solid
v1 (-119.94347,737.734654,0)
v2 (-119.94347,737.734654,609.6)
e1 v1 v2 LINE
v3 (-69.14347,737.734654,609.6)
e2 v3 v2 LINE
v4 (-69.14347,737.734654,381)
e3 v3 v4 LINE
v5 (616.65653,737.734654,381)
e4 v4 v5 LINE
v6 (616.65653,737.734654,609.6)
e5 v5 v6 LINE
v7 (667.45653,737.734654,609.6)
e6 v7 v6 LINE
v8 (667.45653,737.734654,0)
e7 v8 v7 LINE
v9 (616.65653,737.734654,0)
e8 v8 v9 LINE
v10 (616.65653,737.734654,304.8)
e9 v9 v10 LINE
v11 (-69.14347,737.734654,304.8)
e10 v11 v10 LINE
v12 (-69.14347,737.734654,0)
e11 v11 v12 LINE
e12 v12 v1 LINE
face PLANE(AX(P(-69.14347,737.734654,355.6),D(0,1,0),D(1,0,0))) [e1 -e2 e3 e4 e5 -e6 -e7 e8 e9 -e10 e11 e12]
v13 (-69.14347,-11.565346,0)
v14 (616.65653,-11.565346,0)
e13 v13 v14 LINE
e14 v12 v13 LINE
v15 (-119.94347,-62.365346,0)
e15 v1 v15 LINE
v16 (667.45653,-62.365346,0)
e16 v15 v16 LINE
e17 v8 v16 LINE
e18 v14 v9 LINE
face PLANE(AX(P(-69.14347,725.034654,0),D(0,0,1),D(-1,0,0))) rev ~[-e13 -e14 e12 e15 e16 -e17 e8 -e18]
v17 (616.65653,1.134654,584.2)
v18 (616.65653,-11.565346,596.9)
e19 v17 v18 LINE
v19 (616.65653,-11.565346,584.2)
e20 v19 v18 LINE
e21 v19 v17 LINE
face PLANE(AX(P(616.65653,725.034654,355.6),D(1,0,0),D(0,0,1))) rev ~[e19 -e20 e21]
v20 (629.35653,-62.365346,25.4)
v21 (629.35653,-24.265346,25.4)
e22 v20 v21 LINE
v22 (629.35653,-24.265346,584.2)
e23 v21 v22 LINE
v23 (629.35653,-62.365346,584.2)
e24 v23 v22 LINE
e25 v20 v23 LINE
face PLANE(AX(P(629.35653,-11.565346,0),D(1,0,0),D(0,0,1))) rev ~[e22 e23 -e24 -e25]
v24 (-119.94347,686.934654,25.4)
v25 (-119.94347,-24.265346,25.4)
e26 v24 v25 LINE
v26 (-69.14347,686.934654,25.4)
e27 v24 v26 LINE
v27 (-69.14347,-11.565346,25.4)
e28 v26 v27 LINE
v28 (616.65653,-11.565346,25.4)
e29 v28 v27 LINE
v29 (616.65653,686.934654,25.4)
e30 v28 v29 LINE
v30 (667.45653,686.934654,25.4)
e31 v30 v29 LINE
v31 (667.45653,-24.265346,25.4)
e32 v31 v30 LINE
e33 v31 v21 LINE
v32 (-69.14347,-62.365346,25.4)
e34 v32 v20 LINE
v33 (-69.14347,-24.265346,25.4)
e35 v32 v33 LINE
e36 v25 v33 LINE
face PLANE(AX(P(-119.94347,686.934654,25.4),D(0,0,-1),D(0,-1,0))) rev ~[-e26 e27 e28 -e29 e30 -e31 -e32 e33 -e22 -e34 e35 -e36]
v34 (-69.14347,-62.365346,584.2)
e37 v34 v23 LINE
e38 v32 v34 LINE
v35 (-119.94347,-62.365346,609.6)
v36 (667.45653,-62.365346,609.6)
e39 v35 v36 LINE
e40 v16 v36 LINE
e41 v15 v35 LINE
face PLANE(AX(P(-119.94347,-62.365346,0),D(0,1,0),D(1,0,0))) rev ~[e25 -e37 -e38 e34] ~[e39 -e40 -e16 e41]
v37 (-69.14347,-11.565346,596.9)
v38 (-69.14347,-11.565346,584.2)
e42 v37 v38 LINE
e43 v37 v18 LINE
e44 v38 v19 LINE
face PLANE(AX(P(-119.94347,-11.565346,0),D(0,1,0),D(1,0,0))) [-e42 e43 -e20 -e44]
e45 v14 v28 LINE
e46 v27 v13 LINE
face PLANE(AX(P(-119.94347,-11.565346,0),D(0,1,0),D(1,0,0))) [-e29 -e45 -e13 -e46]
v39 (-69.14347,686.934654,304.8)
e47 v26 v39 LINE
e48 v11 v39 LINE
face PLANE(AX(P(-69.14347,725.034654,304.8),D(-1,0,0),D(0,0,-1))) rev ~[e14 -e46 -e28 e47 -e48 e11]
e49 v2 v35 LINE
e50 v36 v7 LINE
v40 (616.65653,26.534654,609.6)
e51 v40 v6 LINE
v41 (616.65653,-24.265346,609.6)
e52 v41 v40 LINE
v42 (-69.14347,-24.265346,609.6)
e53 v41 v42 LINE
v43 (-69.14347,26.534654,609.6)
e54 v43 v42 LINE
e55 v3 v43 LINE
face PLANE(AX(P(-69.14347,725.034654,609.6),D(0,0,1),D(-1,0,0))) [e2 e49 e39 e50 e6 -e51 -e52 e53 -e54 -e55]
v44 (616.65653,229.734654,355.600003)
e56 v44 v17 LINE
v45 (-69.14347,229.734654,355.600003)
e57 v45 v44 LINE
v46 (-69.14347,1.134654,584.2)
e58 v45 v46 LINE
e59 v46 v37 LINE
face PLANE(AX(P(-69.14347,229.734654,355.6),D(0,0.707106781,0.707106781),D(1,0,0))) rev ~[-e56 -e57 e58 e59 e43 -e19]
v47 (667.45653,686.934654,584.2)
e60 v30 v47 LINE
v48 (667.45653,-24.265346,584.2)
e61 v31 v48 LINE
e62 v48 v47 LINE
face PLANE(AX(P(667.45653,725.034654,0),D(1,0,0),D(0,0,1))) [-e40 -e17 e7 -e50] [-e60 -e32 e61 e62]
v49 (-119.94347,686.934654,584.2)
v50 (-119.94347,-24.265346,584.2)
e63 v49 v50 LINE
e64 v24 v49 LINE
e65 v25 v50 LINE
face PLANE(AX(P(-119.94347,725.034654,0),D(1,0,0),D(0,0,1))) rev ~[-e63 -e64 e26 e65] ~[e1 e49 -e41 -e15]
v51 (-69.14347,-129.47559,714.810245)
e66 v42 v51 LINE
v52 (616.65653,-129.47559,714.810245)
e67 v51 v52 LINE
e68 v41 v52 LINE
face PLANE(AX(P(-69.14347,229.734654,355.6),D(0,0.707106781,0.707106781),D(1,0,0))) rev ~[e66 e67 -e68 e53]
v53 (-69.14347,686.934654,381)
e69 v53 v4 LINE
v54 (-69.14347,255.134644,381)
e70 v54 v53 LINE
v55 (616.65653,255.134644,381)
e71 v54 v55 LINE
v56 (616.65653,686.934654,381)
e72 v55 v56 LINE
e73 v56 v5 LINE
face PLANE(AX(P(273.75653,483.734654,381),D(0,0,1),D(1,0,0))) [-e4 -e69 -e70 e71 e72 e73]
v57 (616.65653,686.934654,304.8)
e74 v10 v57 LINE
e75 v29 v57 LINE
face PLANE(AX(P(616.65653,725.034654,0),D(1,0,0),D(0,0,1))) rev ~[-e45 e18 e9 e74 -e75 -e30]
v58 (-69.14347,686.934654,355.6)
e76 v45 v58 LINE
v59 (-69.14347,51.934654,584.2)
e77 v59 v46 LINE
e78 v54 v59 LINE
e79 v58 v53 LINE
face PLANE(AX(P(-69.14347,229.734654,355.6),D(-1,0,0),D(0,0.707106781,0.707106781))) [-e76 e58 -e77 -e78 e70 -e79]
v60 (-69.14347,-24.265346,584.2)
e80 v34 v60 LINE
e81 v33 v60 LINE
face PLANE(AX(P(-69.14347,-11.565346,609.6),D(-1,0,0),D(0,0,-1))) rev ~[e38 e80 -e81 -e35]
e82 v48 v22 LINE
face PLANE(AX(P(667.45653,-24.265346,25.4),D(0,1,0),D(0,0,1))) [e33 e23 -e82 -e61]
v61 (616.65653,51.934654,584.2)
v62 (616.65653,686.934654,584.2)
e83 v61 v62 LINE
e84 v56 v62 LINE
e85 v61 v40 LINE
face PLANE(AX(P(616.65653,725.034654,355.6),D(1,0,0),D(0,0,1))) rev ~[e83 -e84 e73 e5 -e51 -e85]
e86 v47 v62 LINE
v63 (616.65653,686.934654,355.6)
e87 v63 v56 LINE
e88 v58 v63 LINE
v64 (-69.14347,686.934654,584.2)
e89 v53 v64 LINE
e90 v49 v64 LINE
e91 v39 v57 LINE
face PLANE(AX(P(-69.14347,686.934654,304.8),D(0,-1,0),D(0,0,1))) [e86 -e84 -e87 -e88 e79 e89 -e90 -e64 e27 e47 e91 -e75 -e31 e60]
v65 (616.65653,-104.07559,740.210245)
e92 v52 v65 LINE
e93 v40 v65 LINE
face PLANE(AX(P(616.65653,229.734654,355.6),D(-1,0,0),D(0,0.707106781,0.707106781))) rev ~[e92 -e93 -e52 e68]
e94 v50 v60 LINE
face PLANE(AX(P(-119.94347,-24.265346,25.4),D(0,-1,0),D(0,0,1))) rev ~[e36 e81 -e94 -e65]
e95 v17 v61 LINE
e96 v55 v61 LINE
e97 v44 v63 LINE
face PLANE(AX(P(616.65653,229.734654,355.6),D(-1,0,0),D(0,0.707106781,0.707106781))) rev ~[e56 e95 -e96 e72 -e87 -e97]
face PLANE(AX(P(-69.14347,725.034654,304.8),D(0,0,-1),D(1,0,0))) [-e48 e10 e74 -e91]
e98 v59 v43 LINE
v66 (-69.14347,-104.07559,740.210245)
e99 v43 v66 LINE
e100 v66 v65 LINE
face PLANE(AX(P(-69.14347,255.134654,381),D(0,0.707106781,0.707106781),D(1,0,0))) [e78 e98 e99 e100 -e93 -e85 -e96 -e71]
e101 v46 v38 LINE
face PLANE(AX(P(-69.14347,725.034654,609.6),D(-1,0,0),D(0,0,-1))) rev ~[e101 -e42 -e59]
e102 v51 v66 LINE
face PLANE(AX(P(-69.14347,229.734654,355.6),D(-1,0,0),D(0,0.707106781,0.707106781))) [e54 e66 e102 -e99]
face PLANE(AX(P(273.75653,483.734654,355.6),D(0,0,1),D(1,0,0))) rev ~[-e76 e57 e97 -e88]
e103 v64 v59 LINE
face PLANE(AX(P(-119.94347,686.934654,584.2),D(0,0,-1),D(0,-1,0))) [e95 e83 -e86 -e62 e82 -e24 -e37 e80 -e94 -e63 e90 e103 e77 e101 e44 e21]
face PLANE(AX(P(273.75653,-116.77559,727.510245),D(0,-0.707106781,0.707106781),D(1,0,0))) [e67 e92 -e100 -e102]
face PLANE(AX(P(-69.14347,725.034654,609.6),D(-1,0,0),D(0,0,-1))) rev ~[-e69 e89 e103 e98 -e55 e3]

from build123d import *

# Parameters (mm, degrees)
F0_W      = 787.4
F0_H      = 50.8
F1_DEPTH  = 609.6
F2_W      = 711.2
F2_H      = 558.8
F3_DEPTH  = 50.8
F4_W      = 38.1
F4_H      = 609.6
F5_DEPTH  = 736.6
F6_W      = 711.2
F6_H      = 558.8
F7_DEPTH  = 50.8
F8_DEPTH  = 12.7
F10_DEPTH = 736.6
F11_DEPTH = 12.7
F12_W     = 711.2
F12_H     = 558.8
F13_DEPTH = 50.8
F14_W     = 38.1
F14_H     = 50.8
F15_DEPTH = 711.2
F16_DEPTH = 12.7
F17_W     = 685.8
F17_H     = 508
F18_DEPTH = 25.4
F19_SIZE  = 25.39999
F20_W     = 685.8
F20_H     = 35.9210244843
F21_DEPTH = 508


# Not quite as in the source:
# - a fillet or chamfer is up to 0.001 mm smaller than in the source, because OpenCascade refuses the exact size


with BuildPart() as f1:
    # F0 (on Top) → F1 (new body)
    with BuildSketch(Plane.XY):
        with Locations((273.7565302372, -36.9653456569)):
            Rectangle(F0_W, F0_H)
    extrude(amount=F1_DEPTH)

    # F2 (on face) → F3 (cut)
    with BuildSketch(Plane.XZ.offset(62.3653456569)):
        with Locations((273.7565302372, 304.8)):
            Rectangle(F2_W, F2_H)
    extrude(amount=-F3_DEPTH, mode=Mode.SUBTRACT)

    # F4 (on face) → F5 (join)
    with BuildSketch(Plane(origin=(0, -11.5653456569, 0), x_dir=(-1, 0, 0), z_dir=(0, 1, 0))):
        with Locations((-648.4065302372, 304.8)):
            Rectangle(F4_W, F4_H)
    extrude(amount=F5_DEPTH)

    # F6 (on face) → F7 (cut)
    with BuildSketch(Plane.YZ.offset(667.4565302372)):
        with Locations((331.3346543431, 304.8)):
            Rectangle(F6_W, F6_H)
    extrude(amount=-F7_DEPTH, mode=Mode.SUBTRACT)

    # F8 (add): a face of the model
    f8_faces = [f1.faces().sort_by_distance(p)[0] for p in [
        (629.3565302372, -2.0040083027, 12.7),
    ]]
    extrude(f8_faces, amount=F8_DEPTH)

    # F9 (on face) → F10 (join)
    with BuildSketch(Plane(origin=(0, -11.5653456569, 0), x_dir=(-1, 0, 0), z_dir=(0, 1, 0))):
        Polygon((119.9434697628, 0), (119.9434697628, 609.6), (81.8434697628, 609.6), (81.8434697628, 584.2), (81.8434697628, 25.4), (81.8434697628, 0), align=None)
    extrude(amount=F10_DEPTH)

    # F11 (add): a face of the model
    f11_faces = [f1.faces().sort_by_distance(p)[0] for p in [
        (-81.8434697628, 333.3254651539, 304.8),
    ]]
    extrude(f11_faces, amount=F11_DEPTH)

    # F12 (on face) → F13 (cut)
    with BuildSketch(Plane(origin=(-119.9434697628, 0, 0), x_dir=(0, -1, 0), z_dir=(-1, 0, 0))):
        with Locations((-331.3346543431, 304.8)):
            Rectangle(F12_W, F12_H)
    extrude(amount=-F13_DEPTH, mode=Mode.SUBTRACT)

    # F14 (on face) → F15 (join)
    with BuildSketch(Plane.YZ.offset(-69.1434697628)):
        with Locations((705.9846543431, 330.2)):
            Rectangle(F14_W, F14_H)
    extrude(amount=F15_DEPTH)

    # F16 (add): a face of the model
    f16_faces = [f1.faces().sort_by_distance(p)[0] for p in [
        (273.7565302372, 725.0346543431, 313.944),
    ]]
    extrude(f16_faces, amount=F16_DEPTH)

    # F17 (on face) → F18 (join)
    with BuildSketch(Plane.XY.offset(355.6)):
        with Locations((273.7565302372, 483.7346543431)):
            Rectangle(F17_W, F17_H)
    extrude(amount=F18_DEPTH)

    # F19 (size 25.4 in the source; OpenCascade refuses exactly that, so slightly less here)
    f19_edges = [f1.edges().sort_by_distance(p)[0] for p in [
        (273.75653, 229.734654, 381),
    ]]
    chamfer(f19_edges, length=F19_SIZE)

    # F20 (on face) → F21 (join)
    with BuildSketch(Plane(origin=(0, -62.9326728284, 62.9326728284), x_dir=(1, 0, 0), z_dir=(0, -0.7071067812, 0.7071067812))):
        with Locations((273.7565302372, 431.8546155916)):
            Rectangle(F20_W, F20_H)
    extrude(amount=F21_DEPTH)


solid = f1.part
